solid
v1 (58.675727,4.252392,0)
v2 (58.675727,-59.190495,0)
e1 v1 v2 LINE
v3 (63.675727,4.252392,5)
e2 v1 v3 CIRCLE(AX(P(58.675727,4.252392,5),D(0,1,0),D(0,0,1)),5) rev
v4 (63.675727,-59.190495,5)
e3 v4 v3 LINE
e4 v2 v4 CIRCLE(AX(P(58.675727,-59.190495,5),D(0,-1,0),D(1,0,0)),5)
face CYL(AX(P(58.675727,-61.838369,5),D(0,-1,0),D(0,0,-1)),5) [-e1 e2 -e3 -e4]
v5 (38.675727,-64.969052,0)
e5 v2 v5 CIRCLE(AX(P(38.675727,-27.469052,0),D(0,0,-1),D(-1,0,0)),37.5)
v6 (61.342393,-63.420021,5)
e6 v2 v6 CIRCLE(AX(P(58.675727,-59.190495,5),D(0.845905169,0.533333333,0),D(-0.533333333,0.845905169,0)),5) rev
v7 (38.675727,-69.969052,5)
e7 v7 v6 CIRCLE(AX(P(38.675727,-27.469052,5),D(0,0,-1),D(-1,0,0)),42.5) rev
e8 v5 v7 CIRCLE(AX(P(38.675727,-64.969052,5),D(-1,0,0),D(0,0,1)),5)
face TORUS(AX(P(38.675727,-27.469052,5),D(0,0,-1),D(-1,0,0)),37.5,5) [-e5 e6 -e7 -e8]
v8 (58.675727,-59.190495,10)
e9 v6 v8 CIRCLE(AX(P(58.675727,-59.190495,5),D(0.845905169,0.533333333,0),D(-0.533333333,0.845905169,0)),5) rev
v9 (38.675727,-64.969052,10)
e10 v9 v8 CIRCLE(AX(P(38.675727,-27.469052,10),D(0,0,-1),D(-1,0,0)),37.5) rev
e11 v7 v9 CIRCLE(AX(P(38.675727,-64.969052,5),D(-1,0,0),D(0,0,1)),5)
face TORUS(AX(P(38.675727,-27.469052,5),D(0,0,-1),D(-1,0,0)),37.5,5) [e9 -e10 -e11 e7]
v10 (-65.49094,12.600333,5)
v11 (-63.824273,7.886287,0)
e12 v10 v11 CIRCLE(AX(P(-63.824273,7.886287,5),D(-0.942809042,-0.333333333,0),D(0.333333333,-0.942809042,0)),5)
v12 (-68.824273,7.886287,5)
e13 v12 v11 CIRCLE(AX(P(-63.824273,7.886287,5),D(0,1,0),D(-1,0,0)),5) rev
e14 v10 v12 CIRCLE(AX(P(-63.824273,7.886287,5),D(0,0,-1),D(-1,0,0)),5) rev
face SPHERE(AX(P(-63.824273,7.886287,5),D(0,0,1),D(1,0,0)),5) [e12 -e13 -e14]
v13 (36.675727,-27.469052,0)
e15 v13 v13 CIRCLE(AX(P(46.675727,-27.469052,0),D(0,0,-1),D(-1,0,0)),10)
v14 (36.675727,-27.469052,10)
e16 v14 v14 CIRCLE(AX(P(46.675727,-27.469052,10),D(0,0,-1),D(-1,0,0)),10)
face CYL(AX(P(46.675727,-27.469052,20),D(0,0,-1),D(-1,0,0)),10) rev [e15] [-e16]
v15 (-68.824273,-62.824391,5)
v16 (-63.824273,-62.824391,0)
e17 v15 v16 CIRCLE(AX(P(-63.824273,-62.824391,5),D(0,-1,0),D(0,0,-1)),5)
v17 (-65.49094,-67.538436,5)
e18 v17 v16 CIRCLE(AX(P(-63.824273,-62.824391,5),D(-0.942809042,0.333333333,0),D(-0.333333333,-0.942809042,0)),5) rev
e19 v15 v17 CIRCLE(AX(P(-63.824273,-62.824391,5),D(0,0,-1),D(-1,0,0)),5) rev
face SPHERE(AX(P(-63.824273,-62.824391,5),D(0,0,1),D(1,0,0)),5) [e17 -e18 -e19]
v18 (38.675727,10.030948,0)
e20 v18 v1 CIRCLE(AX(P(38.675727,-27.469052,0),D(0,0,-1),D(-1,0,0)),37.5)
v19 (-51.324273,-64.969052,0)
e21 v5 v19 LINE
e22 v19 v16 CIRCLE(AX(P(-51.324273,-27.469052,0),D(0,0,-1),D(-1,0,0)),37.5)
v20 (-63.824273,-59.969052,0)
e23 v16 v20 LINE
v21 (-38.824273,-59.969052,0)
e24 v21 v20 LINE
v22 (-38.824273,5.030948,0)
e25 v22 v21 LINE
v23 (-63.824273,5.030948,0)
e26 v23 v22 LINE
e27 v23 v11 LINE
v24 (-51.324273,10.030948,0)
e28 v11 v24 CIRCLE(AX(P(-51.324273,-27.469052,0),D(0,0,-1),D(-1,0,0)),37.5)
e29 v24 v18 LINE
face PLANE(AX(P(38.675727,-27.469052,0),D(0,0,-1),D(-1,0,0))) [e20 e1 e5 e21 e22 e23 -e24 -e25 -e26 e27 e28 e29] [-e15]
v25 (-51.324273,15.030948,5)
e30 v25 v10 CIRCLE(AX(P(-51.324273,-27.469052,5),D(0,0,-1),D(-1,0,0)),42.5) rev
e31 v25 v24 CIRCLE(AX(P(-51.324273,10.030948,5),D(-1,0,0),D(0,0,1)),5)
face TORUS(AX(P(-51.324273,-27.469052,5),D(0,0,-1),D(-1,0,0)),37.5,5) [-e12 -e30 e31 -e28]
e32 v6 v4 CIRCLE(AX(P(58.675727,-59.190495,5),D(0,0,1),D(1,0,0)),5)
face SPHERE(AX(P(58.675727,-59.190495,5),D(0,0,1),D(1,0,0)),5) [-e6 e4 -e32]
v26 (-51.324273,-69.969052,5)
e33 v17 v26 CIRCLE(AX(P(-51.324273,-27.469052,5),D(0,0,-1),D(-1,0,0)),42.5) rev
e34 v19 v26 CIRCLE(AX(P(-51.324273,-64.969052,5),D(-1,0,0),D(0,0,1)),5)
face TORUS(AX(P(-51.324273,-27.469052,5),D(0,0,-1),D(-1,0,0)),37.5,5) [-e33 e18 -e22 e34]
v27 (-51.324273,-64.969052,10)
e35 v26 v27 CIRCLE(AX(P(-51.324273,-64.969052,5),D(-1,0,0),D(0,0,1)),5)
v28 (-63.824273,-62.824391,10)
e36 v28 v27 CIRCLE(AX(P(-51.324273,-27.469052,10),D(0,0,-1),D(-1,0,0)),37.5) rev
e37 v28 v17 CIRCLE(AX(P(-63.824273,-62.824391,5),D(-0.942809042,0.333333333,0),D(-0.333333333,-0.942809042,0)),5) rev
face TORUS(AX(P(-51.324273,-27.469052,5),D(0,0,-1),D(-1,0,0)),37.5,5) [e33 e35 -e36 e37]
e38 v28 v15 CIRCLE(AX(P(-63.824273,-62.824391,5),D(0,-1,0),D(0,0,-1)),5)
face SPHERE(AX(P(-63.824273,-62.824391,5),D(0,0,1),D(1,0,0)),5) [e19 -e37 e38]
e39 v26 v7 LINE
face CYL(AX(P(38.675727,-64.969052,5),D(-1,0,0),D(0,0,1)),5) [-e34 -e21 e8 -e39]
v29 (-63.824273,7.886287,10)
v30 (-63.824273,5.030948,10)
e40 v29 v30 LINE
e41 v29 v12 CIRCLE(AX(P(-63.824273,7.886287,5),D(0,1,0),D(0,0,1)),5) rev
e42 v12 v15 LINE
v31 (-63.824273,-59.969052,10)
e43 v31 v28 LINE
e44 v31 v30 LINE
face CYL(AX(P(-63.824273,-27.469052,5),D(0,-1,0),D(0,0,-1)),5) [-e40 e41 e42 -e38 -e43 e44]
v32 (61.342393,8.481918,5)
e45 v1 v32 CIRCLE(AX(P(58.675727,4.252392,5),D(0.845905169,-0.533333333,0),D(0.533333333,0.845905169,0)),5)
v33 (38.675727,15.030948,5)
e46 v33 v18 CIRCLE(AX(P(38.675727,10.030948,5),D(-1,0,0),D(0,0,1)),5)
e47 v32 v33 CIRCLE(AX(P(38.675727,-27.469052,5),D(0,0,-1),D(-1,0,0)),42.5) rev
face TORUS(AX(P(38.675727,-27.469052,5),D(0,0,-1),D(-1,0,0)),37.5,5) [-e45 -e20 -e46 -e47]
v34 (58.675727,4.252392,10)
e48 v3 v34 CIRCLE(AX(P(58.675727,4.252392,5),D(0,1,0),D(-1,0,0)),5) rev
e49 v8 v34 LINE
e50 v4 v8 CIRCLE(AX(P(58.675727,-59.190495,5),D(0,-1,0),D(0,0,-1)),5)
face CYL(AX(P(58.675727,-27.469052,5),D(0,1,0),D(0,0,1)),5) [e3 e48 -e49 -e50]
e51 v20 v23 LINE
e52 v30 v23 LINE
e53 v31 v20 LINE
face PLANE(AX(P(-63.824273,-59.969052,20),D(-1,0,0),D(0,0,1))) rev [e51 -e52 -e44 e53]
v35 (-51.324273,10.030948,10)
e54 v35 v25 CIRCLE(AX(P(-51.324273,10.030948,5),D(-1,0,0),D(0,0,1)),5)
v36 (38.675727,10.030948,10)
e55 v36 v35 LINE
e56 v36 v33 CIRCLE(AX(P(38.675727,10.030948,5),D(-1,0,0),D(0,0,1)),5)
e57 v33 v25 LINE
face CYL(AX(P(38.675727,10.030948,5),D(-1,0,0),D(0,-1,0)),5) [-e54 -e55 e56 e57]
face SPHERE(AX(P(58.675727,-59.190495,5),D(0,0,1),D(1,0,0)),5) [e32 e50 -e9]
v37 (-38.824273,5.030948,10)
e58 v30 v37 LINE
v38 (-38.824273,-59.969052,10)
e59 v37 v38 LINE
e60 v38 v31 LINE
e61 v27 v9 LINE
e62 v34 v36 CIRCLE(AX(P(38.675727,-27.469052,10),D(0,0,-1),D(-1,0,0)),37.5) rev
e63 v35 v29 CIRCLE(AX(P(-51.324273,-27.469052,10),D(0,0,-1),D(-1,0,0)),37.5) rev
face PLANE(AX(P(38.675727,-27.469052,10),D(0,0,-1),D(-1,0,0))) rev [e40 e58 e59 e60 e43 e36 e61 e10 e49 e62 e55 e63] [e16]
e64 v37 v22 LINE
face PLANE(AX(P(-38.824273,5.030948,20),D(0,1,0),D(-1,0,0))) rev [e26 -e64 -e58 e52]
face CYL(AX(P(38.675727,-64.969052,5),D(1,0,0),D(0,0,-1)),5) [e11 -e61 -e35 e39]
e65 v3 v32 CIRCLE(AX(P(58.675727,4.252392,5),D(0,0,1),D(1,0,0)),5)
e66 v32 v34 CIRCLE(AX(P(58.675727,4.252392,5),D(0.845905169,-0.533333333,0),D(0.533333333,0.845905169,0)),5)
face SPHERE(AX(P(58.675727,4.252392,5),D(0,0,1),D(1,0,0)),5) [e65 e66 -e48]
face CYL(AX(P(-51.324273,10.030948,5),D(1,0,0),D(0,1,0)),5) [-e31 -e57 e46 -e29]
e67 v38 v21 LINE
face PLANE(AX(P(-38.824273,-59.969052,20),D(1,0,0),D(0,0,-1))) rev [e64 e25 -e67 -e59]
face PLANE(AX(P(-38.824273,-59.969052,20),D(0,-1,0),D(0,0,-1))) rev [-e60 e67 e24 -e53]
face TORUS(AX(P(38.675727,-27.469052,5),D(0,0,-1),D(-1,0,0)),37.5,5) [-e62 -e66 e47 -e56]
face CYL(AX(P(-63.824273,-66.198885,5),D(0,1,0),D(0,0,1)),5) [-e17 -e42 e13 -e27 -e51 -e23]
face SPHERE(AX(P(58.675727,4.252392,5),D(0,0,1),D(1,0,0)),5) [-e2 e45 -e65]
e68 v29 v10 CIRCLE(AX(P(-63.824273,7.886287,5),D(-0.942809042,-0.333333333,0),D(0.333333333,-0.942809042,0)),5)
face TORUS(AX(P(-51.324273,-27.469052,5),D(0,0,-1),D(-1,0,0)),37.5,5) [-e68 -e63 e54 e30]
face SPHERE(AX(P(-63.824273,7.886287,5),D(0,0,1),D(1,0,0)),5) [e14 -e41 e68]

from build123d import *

# Parameters (mm, degrees)
BOSS_EXTRUDE1_DEPTH = 10
SKETCH2_W           = 25
SKETCH2_H           = 65
CUT_EXTRUDE2_DEPTH  = 20
SKETCH3_R           = 10
CUT_EXTRUDE3_DEPTH  = 20
FILLET2_R           = 5


with BuildPart() as part:
    # Sketch1 → Boss-Extrude1 (new body)
    with BuildSketch(Plane.XY):
        with BuildLine():
            Line((-51.324273213, 15.030948404), (38.675726787, 15.030948404))
            ThreePointArc((38.675726787, 15.030948404), (51.820193251, 12.947195155), (63.675726787, 6.900266117))
            Line((63.675726787, 6.900266117), (63.675726787, -61.838369308))
            ThreePointArc((63.675726787, -61.838369308), (51.820193251, -67.885298346), (38.675726787, -69.969051596))
            Line((38.675726787, -69.969051596), (-51.324273213, -69.969051596))
            ThreePointArc((-51.324273213, -69.969051596), (-60.275029546, -69.015819954), (-68.824273213, -66.198885058))
            Line((-68.824273213, -66.198885058), (-68.824273213, 11.260781867))
            ThreePointArc((-68.824273213, 11.260781867), (-60.275029546, 14.077716763), (-51.324273213, 15.030948404))
        make_face()
    extrude(amount=BOSS_EXTRUDE1_DEPTH)

    # Sketch2 → Cut-Extrude2 (cut)
    with BuildSketch(Plane(origin=(0, 0, 0), x_dir=(-1, 0, 0), z_dir=(0, 0, -1))):
        with Locations((51.324273213, -27.469051596)):
            Rectangle(SKETCH2_W, SKETCH2_H)
    extrude(amount=-CUT_EXTRUDE2_DEPTH, mode=Mode.SUBTRACT)

    # Sketch3 → Cut-Extrude3 (cut)
    with BuildSketch(Plane(origin=(0, 0, 0), x_dir=(-1, 0, 0), z_dir=(0, 0, -1))):
        with Locations((-46.675726787, -27.469051596)):
            Circle(SKETCH3_R)
    extrude(amount=-CUT_EXTRUDE3_DEPTH, mode=Mode.SUBTRACT)

    # Fillet2
    fillet2_edges = [part.edges().sort_by_distance(p)[0] for p in [
        (51.820193251, 12.947195155, 10),
        (63.675726787, -27.469051596, 0),
        (51.820193251, -67.885298346, 0),
        (-6.324273213, 15.030948404, 10),
        (38.675726787, -69.969051596, 5),
        (-51.324273213, -69.969051596, 5),
        (-68.824273213, -66.198885058, 5),
        (-68.824273213, 11.260781867, 5),
        (-51.324273213, 15.030948404, 5),
        (38.675726787, 15.030948404, 5),
        (63.675726787, 6.900266117, 5),
        (63.675726787, -61.838369308, 5),
        (-60.275029546, 14.077716763, 10),
        (-68.824273213, -27.469051596, 10),
        (-60.275029546, -69.015819954, 10),
        (-6.324273213, -69.969051596, 10),
        (51.820193251, -67.885298346, 10),
        (63.675726787, -27.469051596, 10),
        (-6.324273213, -69.969051596, 0),
        (-60.275029546, -69.015819954, 0),
        (-68.824273213, -27.469051596, 0),
        (-60.275029546, 14.077716763, 0),
        (-6.324273213, 15.030948404, 0),
        (51.820193251, 12.947195155, 0),
    ]]
    fillet(fillet2_edges, radius=FILLET2_R - 0.0001)  # a hair under: the kernel refuses the full size


solid = part.part
